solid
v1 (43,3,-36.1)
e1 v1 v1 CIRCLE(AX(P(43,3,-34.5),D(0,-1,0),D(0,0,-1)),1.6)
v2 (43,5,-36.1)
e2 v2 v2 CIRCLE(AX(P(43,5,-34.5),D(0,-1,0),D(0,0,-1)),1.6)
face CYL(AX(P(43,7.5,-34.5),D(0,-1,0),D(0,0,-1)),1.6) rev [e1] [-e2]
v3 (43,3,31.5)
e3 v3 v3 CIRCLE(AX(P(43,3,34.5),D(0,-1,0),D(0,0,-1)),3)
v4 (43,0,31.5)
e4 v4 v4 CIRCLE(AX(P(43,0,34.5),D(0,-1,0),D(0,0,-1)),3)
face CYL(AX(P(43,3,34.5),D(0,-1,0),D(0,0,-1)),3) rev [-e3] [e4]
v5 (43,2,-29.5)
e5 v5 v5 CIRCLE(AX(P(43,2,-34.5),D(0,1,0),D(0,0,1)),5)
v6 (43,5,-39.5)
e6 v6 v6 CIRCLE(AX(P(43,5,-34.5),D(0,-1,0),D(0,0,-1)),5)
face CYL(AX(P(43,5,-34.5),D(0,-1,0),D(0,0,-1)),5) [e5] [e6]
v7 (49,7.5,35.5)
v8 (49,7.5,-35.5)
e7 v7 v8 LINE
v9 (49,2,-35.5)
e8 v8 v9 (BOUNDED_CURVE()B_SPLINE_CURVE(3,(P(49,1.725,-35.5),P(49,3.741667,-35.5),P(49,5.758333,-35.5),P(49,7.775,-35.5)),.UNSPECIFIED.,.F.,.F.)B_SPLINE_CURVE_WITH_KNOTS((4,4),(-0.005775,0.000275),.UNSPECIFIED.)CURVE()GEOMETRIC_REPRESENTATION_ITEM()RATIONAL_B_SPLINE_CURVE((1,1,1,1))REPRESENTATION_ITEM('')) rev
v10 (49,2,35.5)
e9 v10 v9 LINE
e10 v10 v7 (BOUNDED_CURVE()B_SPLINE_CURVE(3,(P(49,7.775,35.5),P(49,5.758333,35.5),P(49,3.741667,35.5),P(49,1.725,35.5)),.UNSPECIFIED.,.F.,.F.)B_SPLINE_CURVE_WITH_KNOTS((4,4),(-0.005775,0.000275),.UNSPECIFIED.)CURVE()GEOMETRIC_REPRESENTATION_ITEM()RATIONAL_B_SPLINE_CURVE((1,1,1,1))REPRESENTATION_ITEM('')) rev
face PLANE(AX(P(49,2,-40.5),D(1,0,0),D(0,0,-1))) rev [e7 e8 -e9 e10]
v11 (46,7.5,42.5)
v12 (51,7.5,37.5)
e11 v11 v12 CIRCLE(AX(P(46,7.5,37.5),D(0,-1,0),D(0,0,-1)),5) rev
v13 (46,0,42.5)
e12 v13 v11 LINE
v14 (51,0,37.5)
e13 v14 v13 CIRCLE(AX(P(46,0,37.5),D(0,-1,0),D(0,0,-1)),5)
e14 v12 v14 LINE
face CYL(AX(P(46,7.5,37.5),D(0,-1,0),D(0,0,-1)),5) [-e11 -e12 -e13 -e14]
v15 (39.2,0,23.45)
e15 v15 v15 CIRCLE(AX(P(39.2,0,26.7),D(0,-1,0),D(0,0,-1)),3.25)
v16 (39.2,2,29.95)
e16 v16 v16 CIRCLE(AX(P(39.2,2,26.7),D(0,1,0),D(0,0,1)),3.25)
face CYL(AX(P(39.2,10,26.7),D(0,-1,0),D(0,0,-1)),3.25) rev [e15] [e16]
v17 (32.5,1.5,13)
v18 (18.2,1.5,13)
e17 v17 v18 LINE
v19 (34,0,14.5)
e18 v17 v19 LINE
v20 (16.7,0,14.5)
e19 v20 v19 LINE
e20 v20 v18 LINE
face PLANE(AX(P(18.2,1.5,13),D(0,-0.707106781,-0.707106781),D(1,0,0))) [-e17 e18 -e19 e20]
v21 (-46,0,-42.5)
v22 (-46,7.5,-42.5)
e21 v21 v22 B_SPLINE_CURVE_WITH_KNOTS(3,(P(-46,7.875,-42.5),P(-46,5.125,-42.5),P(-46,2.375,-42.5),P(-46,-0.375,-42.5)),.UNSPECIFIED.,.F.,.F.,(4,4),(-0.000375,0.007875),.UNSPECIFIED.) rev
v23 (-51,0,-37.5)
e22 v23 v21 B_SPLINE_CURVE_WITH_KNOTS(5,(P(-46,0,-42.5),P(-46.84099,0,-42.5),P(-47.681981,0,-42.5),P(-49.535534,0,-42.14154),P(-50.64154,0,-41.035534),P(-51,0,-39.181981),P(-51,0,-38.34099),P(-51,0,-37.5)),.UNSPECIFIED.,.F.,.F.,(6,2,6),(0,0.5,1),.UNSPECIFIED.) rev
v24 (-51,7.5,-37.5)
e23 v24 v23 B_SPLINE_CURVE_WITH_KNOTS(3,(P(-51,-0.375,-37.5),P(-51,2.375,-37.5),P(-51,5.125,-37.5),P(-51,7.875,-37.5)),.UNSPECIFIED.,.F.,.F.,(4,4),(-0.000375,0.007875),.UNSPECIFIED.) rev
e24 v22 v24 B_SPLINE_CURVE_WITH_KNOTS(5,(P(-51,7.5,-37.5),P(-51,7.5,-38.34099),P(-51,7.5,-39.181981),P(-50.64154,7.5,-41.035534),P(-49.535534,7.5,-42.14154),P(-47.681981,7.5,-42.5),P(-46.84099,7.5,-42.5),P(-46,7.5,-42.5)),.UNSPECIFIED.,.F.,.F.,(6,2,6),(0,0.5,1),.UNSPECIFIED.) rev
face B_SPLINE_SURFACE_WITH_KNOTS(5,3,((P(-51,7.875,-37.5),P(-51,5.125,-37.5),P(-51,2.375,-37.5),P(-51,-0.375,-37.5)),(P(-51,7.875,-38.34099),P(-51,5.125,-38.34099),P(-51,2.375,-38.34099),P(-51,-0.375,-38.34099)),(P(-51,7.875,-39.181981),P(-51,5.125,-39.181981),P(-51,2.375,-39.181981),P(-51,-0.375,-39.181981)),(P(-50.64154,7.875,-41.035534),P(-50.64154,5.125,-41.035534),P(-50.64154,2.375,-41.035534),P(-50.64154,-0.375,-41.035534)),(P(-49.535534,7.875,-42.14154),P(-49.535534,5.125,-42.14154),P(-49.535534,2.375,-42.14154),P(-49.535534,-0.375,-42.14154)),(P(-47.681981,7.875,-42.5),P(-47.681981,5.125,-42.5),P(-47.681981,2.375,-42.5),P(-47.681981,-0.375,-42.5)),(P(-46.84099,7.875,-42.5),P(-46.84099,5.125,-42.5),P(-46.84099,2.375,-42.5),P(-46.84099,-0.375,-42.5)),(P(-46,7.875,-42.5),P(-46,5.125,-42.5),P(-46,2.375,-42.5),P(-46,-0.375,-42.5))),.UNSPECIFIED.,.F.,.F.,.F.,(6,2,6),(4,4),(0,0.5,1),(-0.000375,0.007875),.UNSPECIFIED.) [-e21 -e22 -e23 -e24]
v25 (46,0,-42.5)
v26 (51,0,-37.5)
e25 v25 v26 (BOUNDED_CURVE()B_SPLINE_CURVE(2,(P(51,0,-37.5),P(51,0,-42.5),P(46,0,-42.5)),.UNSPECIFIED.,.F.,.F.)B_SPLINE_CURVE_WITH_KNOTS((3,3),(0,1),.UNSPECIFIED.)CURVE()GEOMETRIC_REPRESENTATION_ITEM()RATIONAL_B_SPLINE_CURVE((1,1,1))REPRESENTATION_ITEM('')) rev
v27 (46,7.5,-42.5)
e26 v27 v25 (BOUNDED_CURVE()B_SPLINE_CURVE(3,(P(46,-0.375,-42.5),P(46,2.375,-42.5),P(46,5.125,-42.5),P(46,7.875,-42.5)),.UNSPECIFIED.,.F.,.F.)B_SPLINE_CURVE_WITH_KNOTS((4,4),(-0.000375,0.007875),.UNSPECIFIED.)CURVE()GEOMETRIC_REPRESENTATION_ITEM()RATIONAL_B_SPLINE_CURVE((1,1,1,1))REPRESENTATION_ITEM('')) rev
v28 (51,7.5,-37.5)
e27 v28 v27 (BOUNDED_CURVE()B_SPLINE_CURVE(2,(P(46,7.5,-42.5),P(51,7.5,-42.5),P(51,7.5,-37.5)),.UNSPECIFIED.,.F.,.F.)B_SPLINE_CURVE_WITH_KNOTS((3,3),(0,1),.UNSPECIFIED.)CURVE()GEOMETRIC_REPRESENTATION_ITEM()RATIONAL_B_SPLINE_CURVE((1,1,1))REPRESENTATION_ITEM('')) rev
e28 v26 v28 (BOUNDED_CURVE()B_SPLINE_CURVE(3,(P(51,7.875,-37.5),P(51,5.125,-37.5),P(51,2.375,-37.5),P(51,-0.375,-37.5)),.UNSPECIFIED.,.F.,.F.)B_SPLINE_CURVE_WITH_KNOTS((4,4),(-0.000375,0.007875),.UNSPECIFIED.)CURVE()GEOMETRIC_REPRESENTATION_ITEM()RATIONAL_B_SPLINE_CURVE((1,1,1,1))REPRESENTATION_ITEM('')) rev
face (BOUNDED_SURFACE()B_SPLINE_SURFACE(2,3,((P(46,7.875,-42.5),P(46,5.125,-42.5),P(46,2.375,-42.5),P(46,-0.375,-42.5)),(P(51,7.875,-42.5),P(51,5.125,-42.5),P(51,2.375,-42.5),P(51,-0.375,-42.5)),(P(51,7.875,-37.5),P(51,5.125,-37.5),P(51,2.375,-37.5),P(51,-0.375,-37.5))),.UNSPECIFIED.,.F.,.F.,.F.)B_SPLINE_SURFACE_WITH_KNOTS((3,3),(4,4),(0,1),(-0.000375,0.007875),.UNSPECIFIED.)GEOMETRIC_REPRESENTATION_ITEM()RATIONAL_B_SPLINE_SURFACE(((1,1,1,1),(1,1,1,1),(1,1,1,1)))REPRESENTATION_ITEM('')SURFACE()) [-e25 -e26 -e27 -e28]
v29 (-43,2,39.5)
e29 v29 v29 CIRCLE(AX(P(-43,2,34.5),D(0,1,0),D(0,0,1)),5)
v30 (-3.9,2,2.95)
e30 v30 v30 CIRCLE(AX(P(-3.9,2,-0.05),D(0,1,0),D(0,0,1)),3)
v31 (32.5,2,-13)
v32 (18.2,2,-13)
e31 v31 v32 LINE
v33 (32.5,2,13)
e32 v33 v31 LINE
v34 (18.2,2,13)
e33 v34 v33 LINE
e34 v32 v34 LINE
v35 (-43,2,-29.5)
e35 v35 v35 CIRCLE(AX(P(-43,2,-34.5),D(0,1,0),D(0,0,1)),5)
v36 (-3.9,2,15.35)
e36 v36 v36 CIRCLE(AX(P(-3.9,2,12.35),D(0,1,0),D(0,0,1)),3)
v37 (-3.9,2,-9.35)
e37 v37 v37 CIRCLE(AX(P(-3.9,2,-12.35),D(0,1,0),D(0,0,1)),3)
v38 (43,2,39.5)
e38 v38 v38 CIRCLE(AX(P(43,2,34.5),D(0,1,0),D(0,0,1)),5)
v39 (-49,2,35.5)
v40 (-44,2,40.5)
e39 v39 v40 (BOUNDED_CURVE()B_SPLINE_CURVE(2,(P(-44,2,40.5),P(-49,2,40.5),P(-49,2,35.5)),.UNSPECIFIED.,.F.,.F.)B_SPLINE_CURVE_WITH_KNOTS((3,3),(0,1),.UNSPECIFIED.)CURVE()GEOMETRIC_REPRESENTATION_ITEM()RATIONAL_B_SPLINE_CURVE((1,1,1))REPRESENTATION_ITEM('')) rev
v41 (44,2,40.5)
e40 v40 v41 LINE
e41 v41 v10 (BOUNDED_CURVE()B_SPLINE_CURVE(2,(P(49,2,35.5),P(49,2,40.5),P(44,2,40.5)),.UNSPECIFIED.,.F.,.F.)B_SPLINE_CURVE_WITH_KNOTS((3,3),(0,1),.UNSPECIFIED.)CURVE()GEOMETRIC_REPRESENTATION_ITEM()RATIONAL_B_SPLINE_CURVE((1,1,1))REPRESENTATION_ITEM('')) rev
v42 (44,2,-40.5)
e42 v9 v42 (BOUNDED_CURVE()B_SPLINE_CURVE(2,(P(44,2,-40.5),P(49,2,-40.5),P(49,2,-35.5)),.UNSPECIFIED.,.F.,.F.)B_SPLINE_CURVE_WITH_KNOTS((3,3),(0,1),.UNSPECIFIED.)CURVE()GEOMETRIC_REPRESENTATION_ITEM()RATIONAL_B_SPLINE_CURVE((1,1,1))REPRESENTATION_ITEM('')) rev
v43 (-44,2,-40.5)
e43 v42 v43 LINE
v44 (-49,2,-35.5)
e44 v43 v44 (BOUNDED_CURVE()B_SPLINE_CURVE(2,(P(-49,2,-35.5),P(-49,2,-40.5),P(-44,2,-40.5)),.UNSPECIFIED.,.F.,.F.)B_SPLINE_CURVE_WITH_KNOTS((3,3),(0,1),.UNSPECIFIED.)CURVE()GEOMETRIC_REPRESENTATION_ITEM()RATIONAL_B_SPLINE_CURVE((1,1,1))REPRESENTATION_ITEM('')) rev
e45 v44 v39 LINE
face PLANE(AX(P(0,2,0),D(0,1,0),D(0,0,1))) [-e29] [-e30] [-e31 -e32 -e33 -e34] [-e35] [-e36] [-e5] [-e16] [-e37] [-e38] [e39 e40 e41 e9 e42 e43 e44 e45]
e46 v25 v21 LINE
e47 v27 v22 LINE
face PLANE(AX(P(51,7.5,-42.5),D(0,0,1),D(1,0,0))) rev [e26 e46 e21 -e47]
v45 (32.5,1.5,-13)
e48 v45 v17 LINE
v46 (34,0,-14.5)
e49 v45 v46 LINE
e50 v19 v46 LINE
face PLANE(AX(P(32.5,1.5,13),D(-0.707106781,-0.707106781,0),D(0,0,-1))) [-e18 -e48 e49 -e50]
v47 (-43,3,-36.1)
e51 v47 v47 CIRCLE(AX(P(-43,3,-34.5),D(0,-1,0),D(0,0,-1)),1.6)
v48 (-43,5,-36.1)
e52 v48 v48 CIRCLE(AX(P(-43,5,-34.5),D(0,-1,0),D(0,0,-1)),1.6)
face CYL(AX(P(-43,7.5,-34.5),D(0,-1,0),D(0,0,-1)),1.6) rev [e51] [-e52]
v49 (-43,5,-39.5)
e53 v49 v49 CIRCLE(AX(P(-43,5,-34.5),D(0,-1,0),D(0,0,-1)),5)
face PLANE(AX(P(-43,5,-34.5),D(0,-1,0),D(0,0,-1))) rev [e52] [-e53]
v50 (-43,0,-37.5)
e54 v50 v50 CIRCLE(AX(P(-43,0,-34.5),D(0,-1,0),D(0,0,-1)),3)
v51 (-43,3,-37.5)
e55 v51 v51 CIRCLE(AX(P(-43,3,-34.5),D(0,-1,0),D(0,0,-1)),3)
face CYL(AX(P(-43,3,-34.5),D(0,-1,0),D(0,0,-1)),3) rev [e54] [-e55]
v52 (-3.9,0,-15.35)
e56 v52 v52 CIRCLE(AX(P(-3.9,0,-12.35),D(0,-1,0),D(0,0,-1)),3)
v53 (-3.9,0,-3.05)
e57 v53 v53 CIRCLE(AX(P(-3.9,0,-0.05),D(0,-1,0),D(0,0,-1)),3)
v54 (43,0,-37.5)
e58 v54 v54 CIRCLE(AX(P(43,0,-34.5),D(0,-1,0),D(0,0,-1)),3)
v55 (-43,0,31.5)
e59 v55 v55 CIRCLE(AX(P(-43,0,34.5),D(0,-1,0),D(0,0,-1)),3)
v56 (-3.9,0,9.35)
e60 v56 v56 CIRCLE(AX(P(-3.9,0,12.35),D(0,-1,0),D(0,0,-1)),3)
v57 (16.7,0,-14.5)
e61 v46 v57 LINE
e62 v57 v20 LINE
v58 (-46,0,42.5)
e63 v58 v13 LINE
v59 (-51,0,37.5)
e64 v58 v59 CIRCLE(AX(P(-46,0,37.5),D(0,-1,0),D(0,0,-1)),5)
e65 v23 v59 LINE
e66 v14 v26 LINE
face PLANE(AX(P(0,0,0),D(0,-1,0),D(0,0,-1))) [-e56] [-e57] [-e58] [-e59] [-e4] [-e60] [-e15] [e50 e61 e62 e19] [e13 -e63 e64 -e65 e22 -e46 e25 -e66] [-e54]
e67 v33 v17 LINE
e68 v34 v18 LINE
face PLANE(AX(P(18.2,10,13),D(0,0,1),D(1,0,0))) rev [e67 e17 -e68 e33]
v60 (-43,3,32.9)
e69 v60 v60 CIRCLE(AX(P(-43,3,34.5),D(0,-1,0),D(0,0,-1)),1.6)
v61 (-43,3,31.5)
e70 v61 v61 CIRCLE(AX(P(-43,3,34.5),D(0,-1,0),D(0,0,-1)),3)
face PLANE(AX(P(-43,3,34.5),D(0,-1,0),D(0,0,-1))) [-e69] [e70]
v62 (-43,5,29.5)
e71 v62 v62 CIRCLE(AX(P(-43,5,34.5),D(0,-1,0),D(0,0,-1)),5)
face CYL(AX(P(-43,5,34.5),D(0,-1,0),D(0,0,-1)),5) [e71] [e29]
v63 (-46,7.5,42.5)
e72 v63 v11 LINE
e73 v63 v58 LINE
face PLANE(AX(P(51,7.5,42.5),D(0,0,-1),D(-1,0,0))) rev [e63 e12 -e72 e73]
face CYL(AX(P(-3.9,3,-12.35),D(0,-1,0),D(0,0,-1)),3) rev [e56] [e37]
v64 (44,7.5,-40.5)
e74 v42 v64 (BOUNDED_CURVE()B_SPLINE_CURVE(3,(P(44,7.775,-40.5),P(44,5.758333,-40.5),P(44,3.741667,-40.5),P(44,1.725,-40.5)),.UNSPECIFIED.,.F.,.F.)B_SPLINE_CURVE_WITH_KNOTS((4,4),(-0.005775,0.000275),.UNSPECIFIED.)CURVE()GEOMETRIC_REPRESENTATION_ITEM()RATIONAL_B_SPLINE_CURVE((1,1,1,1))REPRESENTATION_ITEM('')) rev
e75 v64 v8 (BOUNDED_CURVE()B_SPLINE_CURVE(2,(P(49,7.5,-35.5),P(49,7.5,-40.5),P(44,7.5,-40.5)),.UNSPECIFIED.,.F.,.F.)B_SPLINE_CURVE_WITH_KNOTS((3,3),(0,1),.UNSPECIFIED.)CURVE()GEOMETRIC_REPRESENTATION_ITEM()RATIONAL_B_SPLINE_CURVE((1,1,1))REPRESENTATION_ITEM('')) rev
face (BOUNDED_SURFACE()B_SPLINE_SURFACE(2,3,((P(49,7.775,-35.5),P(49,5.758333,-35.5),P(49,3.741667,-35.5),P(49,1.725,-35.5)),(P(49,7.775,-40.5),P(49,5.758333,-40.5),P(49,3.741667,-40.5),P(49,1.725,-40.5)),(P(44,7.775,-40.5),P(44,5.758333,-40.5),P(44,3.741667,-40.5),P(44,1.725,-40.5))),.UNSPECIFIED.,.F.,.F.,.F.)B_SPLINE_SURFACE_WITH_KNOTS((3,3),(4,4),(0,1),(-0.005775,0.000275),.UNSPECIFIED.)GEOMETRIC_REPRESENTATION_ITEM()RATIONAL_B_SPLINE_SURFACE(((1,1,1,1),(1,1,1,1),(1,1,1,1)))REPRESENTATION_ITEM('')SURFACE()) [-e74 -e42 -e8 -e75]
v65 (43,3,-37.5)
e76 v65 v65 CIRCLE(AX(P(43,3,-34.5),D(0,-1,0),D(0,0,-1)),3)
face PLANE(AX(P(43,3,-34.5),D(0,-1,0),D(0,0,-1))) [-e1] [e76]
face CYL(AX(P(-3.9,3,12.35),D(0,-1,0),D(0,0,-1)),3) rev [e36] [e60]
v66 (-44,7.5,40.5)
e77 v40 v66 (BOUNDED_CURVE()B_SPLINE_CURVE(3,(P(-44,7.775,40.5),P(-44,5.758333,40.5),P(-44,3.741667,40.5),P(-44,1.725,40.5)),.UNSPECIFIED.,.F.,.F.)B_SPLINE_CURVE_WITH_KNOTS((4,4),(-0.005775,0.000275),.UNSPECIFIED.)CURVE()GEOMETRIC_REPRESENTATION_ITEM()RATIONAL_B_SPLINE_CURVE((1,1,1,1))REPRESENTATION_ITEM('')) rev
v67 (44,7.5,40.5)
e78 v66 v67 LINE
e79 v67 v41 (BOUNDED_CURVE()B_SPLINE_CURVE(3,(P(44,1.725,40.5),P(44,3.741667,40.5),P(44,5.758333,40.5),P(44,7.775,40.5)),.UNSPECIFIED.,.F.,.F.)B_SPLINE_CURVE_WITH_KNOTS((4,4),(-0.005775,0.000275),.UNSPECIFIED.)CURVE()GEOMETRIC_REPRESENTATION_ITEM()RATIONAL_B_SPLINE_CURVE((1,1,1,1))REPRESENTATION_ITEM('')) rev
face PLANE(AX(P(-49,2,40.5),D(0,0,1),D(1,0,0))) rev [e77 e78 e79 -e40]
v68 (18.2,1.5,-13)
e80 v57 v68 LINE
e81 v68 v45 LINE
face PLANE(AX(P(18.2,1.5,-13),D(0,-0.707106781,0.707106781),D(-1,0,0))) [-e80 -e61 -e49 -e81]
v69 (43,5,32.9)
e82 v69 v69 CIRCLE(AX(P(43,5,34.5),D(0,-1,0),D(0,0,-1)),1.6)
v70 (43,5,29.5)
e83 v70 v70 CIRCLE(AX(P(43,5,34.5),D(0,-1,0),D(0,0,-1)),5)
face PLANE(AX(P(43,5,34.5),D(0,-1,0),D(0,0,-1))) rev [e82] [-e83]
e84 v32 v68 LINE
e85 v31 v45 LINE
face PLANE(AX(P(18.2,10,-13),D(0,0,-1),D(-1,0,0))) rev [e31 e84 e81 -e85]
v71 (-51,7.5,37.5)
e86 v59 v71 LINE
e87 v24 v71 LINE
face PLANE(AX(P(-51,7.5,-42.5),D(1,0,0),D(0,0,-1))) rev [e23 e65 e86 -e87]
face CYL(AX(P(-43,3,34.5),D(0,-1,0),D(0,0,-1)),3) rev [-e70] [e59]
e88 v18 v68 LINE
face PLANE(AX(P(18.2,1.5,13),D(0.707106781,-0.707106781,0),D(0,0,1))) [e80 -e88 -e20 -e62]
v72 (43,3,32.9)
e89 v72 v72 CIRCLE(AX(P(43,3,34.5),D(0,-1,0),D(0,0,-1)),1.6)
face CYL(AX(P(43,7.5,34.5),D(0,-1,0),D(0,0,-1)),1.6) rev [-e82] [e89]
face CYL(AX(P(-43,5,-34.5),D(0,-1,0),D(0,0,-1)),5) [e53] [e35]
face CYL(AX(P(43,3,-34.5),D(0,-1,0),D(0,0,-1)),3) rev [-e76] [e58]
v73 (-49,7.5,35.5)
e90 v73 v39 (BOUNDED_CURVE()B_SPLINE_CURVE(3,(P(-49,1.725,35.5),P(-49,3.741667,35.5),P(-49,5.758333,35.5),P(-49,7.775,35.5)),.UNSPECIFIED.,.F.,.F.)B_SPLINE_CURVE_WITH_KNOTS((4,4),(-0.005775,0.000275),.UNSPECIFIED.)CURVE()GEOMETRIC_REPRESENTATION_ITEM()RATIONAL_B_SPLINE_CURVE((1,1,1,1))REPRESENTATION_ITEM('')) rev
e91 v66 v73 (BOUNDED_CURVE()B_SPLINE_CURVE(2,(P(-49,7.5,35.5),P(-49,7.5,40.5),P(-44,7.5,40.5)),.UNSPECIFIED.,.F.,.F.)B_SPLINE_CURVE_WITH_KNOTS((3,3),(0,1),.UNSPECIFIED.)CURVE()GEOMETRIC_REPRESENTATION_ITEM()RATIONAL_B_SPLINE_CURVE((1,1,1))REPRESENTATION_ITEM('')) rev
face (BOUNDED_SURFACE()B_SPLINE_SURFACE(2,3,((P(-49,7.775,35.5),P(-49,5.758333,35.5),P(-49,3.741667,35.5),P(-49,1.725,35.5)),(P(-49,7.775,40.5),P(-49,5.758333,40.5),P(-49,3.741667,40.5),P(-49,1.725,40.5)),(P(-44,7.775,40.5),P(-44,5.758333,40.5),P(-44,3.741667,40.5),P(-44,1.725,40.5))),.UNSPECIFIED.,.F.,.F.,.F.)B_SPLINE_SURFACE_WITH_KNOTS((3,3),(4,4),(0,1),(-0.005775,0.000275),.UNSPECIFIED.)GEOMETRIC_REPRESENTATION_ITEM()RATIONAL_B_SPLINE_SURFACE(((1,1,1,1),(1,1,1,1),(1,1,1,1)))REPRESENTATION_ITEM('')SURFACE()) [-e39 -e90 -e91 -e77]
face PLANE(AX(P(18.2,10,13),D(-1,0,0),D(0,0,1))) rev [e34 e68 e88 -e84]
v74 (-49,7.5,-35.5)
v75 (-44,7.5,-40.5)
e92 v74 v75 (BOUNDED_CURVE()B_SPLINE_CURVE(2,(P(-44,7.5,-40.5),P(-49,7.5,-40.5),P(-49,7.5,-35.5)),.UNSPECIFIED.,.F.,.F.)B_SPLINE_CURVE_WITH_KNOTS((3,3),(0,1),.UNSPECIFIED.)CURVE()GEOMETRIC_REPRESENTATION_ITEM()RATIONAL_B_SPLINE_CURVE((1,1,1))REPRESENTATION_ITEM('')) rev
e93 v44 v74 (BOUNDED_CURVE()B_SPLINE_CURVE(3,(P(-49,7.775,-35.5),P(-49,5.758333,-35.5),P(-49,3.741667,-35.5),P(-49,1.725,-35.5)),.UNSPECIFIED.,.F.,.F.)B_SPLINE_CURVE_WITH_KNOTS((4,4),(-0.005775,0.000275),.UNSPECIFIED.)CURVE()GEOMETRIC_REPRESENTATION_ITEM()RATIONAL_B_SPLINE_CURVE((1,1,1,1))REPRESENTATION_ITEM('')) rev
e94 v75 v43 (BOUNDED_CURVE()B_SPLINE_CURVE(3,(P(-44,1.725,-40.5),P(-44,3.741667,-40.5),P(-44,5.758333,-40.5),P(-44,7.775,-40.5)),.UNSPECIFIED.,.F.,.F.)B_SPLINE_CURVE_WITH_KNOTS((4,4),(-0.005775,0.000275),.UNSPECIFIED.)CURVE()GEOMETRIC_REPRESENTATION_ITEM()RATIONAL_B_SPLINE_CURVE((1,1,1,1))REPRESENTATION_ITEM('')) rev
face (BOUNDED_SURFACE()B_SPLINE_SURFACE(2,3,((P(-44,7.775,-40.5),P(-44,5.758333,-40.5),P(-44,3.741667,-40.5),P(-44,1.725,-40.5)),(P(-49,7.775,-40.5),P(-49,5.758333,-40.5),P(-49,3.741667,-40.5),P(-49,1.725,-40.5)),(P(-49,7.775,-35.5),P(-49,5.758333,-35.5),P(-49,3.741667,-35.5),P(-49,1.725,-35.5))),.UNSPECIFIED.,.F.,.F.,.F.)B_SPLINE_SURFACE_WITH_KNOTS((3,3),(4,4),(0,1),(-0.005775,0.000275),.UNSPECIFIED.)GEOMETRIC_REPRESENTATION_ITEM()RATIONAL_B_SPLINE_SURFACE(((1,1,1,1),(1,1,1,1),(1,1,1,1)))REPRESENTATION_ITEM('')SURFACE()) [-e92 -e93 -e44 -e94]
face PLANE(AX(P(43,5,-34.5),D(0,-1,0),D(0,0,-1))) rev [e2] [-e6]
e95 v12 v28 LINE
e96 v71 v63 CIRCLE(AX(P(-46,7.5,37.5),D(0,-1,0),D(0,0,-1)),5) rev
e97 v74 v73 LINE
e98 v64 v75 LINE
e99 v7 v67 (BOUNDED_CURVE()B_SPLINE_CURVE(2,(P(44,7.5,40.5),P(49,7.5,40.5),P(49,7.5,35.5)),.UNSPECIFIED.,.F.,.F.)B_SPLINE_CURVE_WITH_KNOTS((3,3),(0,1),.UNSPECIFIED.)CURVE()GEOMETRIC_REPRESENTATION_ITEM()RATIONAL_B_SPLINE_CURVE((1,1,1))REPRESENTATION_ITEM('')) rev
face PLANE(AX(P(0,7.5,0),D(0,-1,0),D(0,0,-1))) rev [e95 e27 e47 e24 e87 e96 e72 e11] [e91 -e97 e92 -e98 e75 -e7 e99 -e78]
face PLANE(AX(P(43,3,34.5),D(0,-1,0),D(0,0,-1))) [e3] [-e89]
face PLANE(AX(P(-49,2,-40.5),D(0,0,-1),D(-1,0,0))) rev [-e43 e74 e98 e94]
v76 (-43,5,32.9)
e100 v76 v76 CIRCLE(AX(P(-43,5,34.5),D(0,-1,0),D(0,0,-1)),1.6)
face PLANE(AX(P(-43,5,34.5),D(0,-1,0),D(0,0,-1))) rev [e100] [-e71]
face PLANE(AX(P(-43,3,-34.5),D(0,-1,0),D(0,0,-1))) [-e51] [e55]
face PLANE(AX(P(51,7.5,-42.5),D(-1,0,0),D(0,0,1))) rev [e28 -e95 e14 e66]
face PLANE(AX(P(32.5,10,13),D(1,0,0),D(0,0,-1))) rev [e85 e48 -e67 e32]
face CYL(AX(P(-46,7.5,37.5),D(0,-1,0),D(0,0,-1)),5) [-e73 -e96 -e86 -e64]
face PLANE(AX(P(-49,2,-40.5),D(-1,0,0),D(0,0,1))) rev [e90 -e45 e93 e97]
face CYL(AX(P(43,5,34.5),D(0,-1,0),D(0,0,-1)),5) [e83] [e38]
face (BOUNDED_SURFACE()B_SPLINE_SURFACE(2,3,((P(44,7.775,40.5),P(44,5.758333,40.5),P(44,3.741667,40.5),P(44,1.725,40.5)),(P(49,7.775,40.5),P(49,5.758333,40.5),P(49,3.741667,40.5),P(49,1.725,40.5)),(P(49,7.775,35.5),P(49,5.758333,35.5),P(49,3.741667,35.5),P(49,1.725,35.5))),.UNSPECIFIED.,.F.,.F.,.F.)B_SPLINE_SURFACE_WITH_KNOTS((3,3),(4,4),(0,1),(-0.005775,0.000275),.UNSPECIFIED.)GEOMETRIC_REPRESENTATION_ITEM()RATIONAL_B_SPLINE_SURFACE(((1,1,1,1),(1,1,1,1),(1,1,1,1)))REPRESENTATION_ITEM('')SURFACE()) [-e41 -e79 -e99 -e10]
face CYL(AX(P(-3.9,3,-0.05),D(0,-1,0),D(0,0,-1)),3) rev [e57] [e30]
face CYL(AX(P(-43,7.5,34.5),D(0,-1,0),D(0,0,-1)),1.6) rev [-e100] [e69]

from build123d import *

# Parameters (mm, degrees)
SKETCH1_W           = 102
SKETCH1_H           = 85
BOSS_EXTRUDE1_DEPTH = 7.5
SKETCH2_W           = 98
SKETCH2_H           = 81
CUT_EXTRUDE1_DEPTH  = 5.5
SKETCH3_R           = 5
BOSS_EXTRUDE2_DEPTH = 4
SKETCH3_3_R         = 5
BOSS_EXTRUDE3_DEPTH = 5
SKETCH4_R           = 3
CUT_EXTRUDE3_DEPTH  = 3
SKETCH5_R           = 1.6
CUT_EXTRUDE4_DEPTH  = 7.5
SKETCH6_W           = 14.3
SKETCH6_H           = 26
CUT_EXTRUDE5_DEPTH  = 10
CHAMFER1_SIZE       = 1.5
CHAMFER2_SIZE       = 1.5
CHAMFER3_SIZE       = 1.5
CHAMFER4_SIZE       = 1.5
SKETCH7_R           = 3.25
CUT_EXTRUDE6_DEPTH  = 10
FILLET2_R           = 5
FILLET3_SIZE        = 5
FILLET4_R           = 5
FILLET5_SIZE        = 5
FILLET6_SIZE        = 5
FILLET7_SIZE        = 5
FILLET8_SIZE        = 5
FILLET9_SIZE        = 5
SKETCH8_R           = 3
CUT_EXTRUDE7_DEPTH  = 3


with BuildPart() as part:
    # Sketch1 → Boss-Extrude1 (new body)
    with BuildSketch(Plane(origin=(0, 0, 0), x_dir=(1, 0, 0), z_dir=(0, 1, 0))):
        Rectangle(SKETCH1_W, SKETCH1_H)
    extrude(amount=BOSS_EXTRUDE1_DEPTH)

    # Sketch2 → Cut-Extrude1 (cut)
    with BuildSketch(Plane(origin=(0, 7.5, 0), x_dir=(1, 0, 0), z_dir=(0, 1, 0))):
        Rectangle(SKETCH2_W, SKETCH2_H)
    extrude(amount=-CUT_EXTRUDE1_DEPTH, mode=Mode.SUBTRACT)



with BuildPart() as body_2:
    # Sketch3 → Boss-Extrude2 (new body)
    with BuildSketch(Plane(origin=(0, 0, 0), x_dir=(-1, 0, 0), z_dir=(0, -1, 0))):
        with Locations(Location((43, -34.5, 0), (0, 0, 90))):
            Circle(SKETCH3_R)
    extrude(amount=-BOSS_EXTRUDE2_DEPTH)


with BuildPart() as part_1:
    add(part.part)

    add(body_2.part)  # Boss-Extrude3 merges body 2
    # Sketch3<3> → Boss-Extrude3 (add)
    with BuildSketch(Plane(origin=(0, 0, 0), x_dir=(-1, 0, 0), z_dir=(0, -1, 0))):
        with Locations(Location((43, -34.5, 0), (0, 0, 90))):
            Circle(SKETCH3_3_R)
        with Locations(Location((-43, -34.5, 0), (0, 0, 90))):
            Circle(SKETCH3_3_R)
        with Locations(Location((43, 34.5, 0), (0, 0, 90))):
            Circle(SKETCH3_3_R)
        with Locations(Location((-43, 34.5, 0), (0, 0, 90))):
            Circle(SKETCH3_3_R)
    extrude(amount=-BOSS_EXTRUDE3_DEPTH)

    # Sketch4 → Cut-Extrude3 (cut)
    with BuildSketch(Plane.XZ):
        with Locations(Location((-43, 34.5, 0), (0, 0, 270))):
            Circle(SKETCH4_R)
        with Locations(Location((43, 34.5, 0), (0, 0, 270))):
            Circle(SKETCH4_R)
        with Locations(Location((-43, -34.5, 0), (0, 0, 270))):
            Circle(SKETCH4_R)
        with Locations(Location((43, -34.5, 0), (0, 0, 270))):
            Circle(SKETCH4_R)
    extrude(amount=-CUT_EXTRUDE3_DEPTH, mode=Mode.SUBTRACT)

    # Sketch5 → Cut-Extrude4 (cut)
    with BuildSketch(Plane.XZ):
        with Locations(Location((-43, 34.5, 0), (0, 0, 270))):
            Circle(SKETCH5_R)
        with Locations(Location((43, 34.5, 0), (0, 0, 270))):
            Circle(SKETCH5_R)
        with Locations(Location((43, -34.5, 0), (0, 0, 270))):
            Circle(SKETCH5_R)
        with Locations(Location((-43, -34.5, 0), (0, 0, 270))):
            Circle(SKETCH5_R)
    extrude(amount=-CUT_EXTRUDE4_DEPTH, mode=Mode.SUBTRACT)

    # Sketch6 → Cut-Extrude5 (cut)
    with BuildSketch(Plane.XZ):
        with Locations((25.35, 0)):
            Rectangle(SKETCH6_W, SKETCH6_H)
    extrude(amount=-CUT_EXTRUDE5_DEPTH, mode=Mode.SUBTRACT)

    # Chamfer1
    chamfer1_edges = [part_1.edges().sort_by_distance(p)[0] for p in [
        (25.35, 0, 13),
    ]]
    chamfer(chamfer1_edges, length=CHAMFER1_SIZE)

    # Chamfer2
    chamfer2_edges = [part_1.edges().sort_by_distance(p)[0] for p in [
        (18.2, 0, 0.75),
    ]]
    chamfer(chamfer2_edges, length=CHAMFER2_SIZE)

    # Chamfer3
    chamfer3_edges = [part_1.edges().sort_by_distance(p)[0] for p in [
        (32.5, 0, 0.75),
    ]]
    chamfer(chamfer3_edges, length=CHAMFER3_SIZE)

    # Chamfer4
    chamfer4_edges = [part_1.edges().sort_by_distance(p)[0] for p in [
        (25.35, 0, -13),
    ]]
    chamfer(chamfer4_edges, length=CHAMFER4_SIZE)

    # Sketch7 → Cut-Extrude6 (cut)
    with BuildSketch(Plane(origin=(0, 0, 0), x_dir=(-1, 0, 0), z_dir=(0, -1, 0))):
        with Locations(Location((-39.2, -26.7, 0), (0, 0, 90))):
            Circle(SKETCH7_R)
    extrude(amount=-CUT_EXTRUDE6_DEPTH, mode=Mode.SUBTRACT)

    # Fillet2
    fillet2_edges = [part_1.edges().sort_by_distance(p)[0] for p in [
        (51, 3.75, 42.5),
    ]]
    fillet(fillet2_edges, radius=FILLET2_R)

    # Fillet3
    # a fillet whose section is not a circle: 5 mm, written as the material it takes off along each edge
    with BuildSketch(Plane(origin=(51, -12.5, -42.5), x_dir=(0, 0, 1), z_dir=(0, 1, 0))) as fillet3_piece_1:
        with BuildLine():
            Bezier((FILLET3_SIZE, 0), (0, 0), (0, -FILLET3_SIZE), weights=[1, 1, 1])
            Line((0, -FILLET3_SIZE), (0, 0))
            Line((0, 0), (FILLET3_SIZE, 0))
        make_face()
    extrude(amount=32.5, mode=Mode.SUBTRACT)

    # Fillet4
    fillet4_edges = [part_1.edges().sort_by_distance(p)[0] for p in [
        (-51, 3.75, 42.5),
    ]]
    fillet(fillet4_edges, radius=FILLET4_R)

    # Fillet5
    # a fillet whose section is not a circle: 5 mm, written as the material it takes off along each edge
    with BuildSketch(Plane(origin=(-51, -12.5, -42.5), x_dir=(0, 0, 1), z_dir=(0, 1, 0))) as fillet5_piece_1:
        with BuildLine():
            add(Edge.make_bspline([(FILLET5_SIZE, 0), (FILLET5_SIZE * 0.831801948466, 0), (FILLET5_SIZE * 0.663603896932, 0), (FILLET5_SIZE * 0.292893218813, FILLET5_SIZE * 0.0716919198361), (FILLET5_SIZE * 0.0716919198361, FILLET5_SIZE * 0.292893218813), (0, FILLET5_SIZE * 0.663603896932), (0, FILLET5_SIZE * 0.831801948466), (0, FILLET5_SIZE)], knots=[0, 0, 0, 0, 0, 0, 0.5, 0.5, 1, 1, 1, 1, 1, 1], degree=5))
            Line((0, FILLET5_SIZE), (0, 0))
            Line((0, 0), (FILLET5_SIZE, 0))
        make_face()
    extrude(amount=32.5, mode=Mode.SUBTRACT)

    # Fillet6
    # a fillet whose section is not a circle: 5 mm, written as the material it adds along each edge
    with BuildSketch(Plane(origin=(49, 7.5, -40.5), x_dir=(-1, 0, 0), z_dir=(0, -1, 0))) as fillet6_piece_1:
        with BuildLine():
            Bezier((FILLET6_SIZE, 0), (0, 0), (0, -FILLET6_SIZE), weights=[1, 1, 1])
            Line((0, -FILLET6_SIZE), (0, 0))
            Line((0, 0), (FILLET6_SIZE, 0))
        make_face()
    extrude(amount=5.5)

    # Fillet7
    # a fillet whose section is not a circle: 5 mm, written as the material it adds along each edge
    with BuildSketch(Plane(origin=(49, 7.5, 40.5), x_dir=(0, 0, -1), z_dir=(0, -1, 0))) as fillet7_piece_1:
        with BuildLine():
            Bezier((FILLET7_SIZE, 0), (0, 0), (0, -FILLET7_SIZE), weights=[1, 1, 1])
            Line((0, -FILLET7_SIZE), (0, 0))
            Line((0, 0), (FILLET7_SIZE, 0))
        make_face()
    extrude(amount=5.5)

    # Fillet8
    # a fillet whose section is not a circle: 5 mm, written as the material it adds along each edge
    with BuildSketch(Plane(origin=(-49, 7.5, 40.5), x_dir=(1, 0, 0), z_dir=(0, -1, 0))) as fillet8_piece_1:
        with BuildLine():
            Bezier((FILLET8_SIZE, 0), (0, 0), (0, -FILLET8_SIZE), weights=[1, 1, 1])
            Line((0, -FILLET8_SIZE), (0, 0))
            Line((0, 0), (FILLET8_SIZE, 0))
        make_face()
    extrude(amount=5.5)

    # Fillet9
    # a fillet whose section is not a circle: 5 mm, written as the material it adds along each edge
    with BuildSketch(Plane(origin=(-49, 7.5, -40.5), x_dir=(0, 0, 1), z_dir=(0, -1, 0))) as fillet9_piece_1_section:
        with BuildLine():
            Bezier((FILLET9_SIZE, 0), (0, 0), (0, -FILLET9_SIZE), weights=[1, 1, 1])
            Line((0, -FILLET9_SIZE), (0, 0))
            Line((0, 0), (FILLET9_SIZE, 0))
        make_face()
    fillet9_piece_1 = extrude(amount=18, mode=Mode.PRIVATE)
    fillet9_piece_1 = split(fillet9_piece_1, bisect_by=Plane(origin=(-49, 0, -40.5), z_dir=(0, 1, 0)), keep=Keep.TOP, mode=Mode.PRIVATE)
    add(fillet9_piece_1)

    # Sketch8 → Cut-Extrude7 (cut)
    with BuildSketch(Plane.XZ):
        with Locations(Location((-3.9, -12.35, 0), (0, 0, 270))):
            Circle(SKETCH8_R)
        with Locations(Location((-3.9, -0.05, 0), (0, 0, 270))):
            Circle(SKETCH8_R)
        with Locations(Location((-3.9, 12.35, 0), (0, 0, 270))):
            Circle(SKETCH8_R)
    extrude(amount=-CUT_EXTRUDE7_DEPTH, mode=Mode.SUBTRACT)


solid = part_1.part
